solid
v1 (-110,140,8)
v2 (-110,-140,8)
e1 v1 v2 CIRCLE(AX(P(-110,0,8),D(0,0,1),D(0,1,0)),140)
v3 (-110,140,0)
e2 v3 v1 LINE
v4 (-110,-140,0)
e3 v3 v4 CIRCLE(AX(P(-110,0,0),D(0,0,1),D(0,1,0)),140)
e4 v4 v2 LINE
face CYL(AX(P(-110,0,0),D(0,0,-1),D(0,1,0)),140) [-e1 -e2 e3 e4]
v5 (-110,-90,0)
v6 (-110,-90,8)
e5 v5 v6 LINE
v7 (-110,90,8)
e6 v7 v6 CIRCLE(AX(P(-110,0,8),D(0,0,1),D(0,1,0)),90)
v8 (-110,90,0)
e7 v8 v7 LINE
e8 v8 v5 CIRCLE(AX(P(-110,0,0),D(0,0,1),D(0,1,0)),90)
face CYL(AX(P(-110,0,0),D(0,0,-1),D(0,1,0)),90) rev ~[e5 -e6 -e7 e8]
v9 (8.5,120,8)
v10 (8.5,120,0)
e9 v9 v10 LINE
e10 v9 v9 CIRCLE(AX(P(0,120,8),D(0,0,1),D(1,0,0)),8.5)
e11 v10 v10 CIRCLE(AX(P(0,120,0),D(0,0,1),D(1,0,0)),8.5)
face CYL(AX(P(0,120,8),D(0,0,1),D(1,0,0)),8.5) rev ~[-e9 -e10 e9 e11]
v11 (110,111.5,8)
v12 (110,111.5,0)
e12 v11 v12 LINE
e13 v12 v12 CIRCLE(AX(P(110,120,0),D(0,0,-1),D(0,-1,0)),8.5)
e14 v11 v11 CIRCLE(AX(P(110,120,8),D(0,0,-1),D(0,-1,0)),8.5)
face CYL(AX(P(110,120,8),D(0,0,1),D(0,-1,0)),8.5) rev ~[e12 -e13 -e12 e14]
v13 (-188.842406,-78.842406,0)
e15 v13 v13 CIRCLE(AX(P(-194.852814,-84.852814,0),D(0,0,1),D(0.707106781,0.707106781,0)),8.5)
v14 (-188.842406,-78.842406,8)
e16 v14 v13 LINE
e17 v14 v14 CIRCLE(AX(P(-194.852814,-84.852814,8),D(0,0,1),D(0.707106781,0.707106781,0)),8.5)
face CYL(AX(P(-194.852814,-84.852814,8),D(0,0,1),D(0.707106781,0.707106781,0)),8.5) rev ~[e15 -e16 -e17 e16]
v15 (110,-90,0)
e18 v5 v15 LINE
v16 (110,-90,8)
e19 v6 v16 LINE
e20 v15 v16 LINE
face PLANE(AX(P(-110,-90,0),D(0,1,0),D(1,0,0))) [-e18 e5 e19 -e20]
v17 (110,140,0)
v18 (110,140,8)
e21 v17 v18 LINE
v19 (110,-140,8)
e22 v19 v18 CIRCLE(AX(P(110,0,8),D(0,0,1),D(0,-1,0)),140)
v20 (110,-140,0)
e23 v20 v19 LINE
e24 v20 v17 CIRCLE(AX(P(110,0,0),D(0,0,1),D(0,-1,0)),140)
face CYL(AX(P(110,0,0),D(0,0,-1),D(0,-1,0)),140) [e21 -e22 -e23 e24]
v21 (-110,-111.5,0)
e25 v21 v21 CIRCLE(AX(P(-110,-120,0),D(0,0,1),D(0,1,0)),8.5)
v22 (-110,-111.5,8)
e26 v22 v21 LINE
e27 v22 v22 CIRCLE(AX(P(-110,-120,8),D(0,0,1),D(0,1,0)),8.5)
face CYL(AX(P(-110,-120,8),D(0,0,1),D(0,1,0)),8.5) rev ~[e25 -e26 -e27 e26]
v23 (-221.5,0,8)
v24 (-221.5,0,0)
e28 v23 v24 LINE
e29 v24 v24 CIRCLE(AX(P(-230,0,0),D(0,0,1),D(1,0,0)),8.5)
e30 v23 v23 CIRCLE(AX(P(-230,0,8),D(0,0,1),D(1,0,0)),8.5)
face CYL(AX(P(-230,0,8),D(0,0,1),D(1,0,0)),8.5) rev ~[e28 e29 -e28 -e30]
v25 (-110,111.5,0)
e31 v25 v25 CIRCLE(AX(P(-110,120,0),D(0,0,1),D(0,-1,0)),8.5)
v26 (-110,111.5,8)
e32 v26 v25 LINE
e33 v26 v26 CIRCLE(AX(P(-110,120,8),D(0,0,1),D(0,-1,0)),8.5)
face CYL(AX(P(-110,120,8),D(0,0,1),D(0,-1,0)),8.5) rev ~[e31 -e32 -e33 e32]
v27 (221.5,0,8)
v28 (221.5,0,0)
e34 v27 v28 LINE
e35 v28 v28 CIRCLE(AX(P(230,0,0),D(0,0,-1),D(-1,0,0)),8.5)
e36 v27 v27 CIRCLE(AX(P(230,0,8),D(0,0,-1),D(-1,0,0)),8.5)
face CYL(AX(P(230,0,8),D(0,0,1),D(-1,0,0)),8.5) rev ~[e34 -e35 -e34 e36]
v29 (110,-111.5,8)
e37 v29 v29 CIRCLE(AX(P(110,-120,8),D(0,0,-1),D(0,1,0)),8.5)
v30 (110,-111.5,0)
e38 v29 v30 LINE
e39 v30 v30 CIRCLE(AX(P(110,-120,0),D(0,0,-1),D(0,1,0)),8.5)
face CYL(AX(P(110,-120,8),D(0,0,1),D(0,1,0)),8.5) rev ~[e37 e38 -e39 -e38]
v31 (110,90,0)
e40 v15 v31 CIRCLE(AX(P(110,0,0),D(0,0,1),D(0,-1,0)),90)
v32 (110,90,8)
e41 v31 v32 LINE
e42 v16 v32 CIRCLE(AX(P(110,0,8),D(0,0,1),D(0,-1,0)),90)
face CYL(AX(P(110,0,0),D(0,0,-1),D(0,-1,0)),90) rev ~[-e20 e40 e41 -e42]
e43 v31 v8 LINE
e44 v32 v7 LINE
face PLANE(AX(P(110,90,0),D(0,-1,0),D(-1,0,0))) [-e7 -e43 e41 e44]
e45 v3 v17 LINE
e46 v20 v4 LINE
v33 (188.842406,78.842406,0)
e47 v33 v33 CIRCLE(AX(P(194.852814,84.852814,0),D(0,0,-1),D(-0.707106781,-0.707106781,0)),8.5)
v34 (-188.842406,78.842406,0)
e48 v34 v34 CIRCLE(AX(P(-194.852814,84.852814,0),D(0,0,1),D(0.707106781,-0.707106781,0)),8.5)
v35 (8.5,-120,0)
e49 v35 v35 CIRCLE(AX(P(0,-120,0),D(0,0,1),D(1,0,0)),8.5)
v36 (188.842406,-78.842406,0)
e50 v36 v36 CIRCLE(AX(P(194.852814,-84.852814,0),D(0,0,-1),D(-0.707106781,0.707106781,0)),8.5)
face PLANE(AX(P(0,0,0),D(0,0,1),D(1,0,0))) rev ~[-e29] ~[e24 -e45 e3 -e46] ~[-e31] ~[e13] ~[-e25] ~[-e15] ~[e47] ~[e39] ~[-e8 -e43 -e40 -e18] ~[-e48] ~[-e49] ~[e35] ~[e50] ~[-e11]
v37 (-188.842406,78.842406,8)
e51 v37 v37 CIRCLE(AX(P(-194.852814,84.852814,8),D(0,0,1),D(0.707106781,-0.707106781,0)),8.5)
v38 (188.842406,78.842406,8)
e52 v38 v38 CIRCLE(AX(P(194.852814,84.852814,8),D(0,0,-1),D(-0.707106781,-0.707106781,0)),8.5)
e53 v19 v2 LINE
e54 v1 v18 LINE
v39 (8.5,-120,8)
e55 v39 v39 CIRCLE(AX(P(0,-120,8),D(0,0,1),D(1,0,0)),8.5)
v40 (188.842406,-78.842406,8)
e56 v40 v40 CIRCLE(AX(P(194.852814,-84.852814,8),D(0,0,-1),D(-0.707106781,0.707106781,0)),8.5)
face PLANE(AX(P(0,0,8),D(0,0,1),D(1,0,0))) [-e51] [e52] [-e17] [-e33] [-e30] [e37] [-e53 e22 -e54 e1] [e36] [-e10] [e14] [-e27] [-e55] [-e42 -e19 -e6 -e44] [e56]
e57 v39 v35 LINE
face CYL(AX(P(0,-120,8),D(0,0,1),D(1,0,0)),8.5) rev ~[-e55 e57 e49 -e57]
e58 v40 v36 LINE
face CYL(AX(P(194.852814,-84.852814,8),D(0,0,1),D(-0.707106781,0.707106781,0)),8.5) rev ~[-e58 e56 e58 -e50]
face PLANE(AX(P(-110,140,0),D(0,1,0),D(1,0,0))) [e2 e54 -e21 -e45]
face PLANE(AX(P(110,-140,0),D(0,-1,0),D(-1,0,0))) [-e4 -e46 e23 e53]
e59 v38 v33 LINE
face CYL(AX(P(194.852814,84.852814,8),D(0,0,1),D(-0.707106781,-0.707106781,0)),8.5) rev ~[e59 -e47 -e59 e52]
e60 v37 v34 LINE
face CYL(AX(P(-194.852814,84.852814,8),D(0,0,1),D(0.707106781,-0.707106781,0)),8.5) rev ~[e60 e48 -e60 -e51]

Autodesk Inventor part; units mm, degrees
ref_plane "YZ Plane" through (0, 0, 0) normal (1, 0, 0) x (0, 1, 0)
ref_plane "XZ Plane" through (0, 0, 0) normal (0, 1, 0) x (-1, 0, 0)
ref_plane "XY Plane" through (0, 0, 0) normal (0, 0, 1) x (1, 0, 0)
sketch "Sketch2" plane through (0, 0, 0) normal (0, 0, 1) x (1, 0, 0)
  line L0 (-110, 0) -> (110, 0) construction
  line L1 (-110, -90) -> (110, -90)
  line L2 (110, 90) -> (-110, 90)
  arc A0 (-110, 90) -> (-110, -90) centre (-110, 0) ccw
  arc A1 (110, -90) -> (110, 90) centre (110, 0) ccw
  line L3 (-200, 0) -> (200, 0) construction
  line L4 (-110, 140) -> (110, 140)
  arc A2 (110, -140) -> (110, 140) centre (110, 0) ccw
  line L5 (110, -140) -> (-110, -140)
  arc A3 (-110, 140) -> (-110, -140) centre (-110, 0) ccw
  point P0 (0, 0)
  dimension "Charging_hatch_width" = 400
  dimension "d11" = 400
  dimension "d12" = 180
  dimension "d13" = 50
extrude "Plate2" add sketch "Sketch2" along normal blind 8
sketch "Sketch3" plane through (0, 0, 8) normal (0, 0, 1) x (1, 0, 0)
  arc A0 (-110, 140) -> (-110, -140) centre (-110, 0) ccw construction
  line L0 (-110, 140) -> (110, 140) construction
  arc A1 (110, -140) -> (110, 140) centre (110, 0) ccw construction
  line L1 (110, -140) -> (-110, -140) projected
  circle A2 centre (-230, 0) radius 8.5
  arc A3 (-110, 120) -> (-110, -120) centre (-110, 0) ccw construction
  line L2 (-110, 120) -> (110, 120) construction
  arc A4 (110, -120) -> (110, 120) centre (110, 0) ccw construction
  line L3 (110, -120) -> (-110, -120) construction
  point P0 (0, 0)
  dimension "Charging_hatch_width" = 400
  dimension "d15" = 17
  dimension "d16" = 20
extrude "Cut1" cut sketch "Sketch3" against normal blind 8
pattern_circular "Circular Pattern1" count 5 over 180 about axis through (-110, 0, 0) along (0, 0, 1) of "Cut1" both ways yes
mirror "Mirror1" about plane through (0, 0, 0) normal (1, 0, 0) of "Cut1", "Circular Pattern1"
sketch "Sketch4" plane through (0, 0, 8) normal (0, 0, 1) x (1, 0, 0)
  circle A0 centre (-110, 120) radius 8.5 construction
  circle A1 centre (110, 120) radius 8.5 construction
  circle A2 centre (-110, -120) radius 8.5 construction
  circle A3 centre (110, -120) radius 8.5 construction
  circle A4 centre (0, -120) radius 8.5
  circle A5 centre (0, 120) radius 8.5
  point P0 (0, 0)
  dimension "Charging_hatch_width" = 400
  dimension "d22" = 0
extrude "Cut2" cut sketch "Sketch4" against normal blind 8
equation "\"d11\" = Charging_hatch_width"
equation "\"d12\" = Charging_hatch_hight"
equation "\"d17\" = Thickness"
equation "\"d23\" = Thickness"
equation "\"d14\" = Thickness"
equation "\"BendReliefWidth\" = Thickness"
equation "\"BendReliefDepth\" = 0.5 * Thickness"
equation "\"CornerReliefSize\" = 4 * Thickness"
equation "\"MinimumRemnant\" = 2 * Thickness"
equation "\"TransitionRadius\" = BendRadius"
equation "\"JacobiRadiusSize\" = BendRadius"
equation "\"GapSize\" = Thickness"
equation "\"Charging_hatch_hight\" = 180"
equation "\"Thickness\" = 8"
equation "\"BendRadius\" = 6"
properties part number "PNS-731 charging flange" material "Steel"
